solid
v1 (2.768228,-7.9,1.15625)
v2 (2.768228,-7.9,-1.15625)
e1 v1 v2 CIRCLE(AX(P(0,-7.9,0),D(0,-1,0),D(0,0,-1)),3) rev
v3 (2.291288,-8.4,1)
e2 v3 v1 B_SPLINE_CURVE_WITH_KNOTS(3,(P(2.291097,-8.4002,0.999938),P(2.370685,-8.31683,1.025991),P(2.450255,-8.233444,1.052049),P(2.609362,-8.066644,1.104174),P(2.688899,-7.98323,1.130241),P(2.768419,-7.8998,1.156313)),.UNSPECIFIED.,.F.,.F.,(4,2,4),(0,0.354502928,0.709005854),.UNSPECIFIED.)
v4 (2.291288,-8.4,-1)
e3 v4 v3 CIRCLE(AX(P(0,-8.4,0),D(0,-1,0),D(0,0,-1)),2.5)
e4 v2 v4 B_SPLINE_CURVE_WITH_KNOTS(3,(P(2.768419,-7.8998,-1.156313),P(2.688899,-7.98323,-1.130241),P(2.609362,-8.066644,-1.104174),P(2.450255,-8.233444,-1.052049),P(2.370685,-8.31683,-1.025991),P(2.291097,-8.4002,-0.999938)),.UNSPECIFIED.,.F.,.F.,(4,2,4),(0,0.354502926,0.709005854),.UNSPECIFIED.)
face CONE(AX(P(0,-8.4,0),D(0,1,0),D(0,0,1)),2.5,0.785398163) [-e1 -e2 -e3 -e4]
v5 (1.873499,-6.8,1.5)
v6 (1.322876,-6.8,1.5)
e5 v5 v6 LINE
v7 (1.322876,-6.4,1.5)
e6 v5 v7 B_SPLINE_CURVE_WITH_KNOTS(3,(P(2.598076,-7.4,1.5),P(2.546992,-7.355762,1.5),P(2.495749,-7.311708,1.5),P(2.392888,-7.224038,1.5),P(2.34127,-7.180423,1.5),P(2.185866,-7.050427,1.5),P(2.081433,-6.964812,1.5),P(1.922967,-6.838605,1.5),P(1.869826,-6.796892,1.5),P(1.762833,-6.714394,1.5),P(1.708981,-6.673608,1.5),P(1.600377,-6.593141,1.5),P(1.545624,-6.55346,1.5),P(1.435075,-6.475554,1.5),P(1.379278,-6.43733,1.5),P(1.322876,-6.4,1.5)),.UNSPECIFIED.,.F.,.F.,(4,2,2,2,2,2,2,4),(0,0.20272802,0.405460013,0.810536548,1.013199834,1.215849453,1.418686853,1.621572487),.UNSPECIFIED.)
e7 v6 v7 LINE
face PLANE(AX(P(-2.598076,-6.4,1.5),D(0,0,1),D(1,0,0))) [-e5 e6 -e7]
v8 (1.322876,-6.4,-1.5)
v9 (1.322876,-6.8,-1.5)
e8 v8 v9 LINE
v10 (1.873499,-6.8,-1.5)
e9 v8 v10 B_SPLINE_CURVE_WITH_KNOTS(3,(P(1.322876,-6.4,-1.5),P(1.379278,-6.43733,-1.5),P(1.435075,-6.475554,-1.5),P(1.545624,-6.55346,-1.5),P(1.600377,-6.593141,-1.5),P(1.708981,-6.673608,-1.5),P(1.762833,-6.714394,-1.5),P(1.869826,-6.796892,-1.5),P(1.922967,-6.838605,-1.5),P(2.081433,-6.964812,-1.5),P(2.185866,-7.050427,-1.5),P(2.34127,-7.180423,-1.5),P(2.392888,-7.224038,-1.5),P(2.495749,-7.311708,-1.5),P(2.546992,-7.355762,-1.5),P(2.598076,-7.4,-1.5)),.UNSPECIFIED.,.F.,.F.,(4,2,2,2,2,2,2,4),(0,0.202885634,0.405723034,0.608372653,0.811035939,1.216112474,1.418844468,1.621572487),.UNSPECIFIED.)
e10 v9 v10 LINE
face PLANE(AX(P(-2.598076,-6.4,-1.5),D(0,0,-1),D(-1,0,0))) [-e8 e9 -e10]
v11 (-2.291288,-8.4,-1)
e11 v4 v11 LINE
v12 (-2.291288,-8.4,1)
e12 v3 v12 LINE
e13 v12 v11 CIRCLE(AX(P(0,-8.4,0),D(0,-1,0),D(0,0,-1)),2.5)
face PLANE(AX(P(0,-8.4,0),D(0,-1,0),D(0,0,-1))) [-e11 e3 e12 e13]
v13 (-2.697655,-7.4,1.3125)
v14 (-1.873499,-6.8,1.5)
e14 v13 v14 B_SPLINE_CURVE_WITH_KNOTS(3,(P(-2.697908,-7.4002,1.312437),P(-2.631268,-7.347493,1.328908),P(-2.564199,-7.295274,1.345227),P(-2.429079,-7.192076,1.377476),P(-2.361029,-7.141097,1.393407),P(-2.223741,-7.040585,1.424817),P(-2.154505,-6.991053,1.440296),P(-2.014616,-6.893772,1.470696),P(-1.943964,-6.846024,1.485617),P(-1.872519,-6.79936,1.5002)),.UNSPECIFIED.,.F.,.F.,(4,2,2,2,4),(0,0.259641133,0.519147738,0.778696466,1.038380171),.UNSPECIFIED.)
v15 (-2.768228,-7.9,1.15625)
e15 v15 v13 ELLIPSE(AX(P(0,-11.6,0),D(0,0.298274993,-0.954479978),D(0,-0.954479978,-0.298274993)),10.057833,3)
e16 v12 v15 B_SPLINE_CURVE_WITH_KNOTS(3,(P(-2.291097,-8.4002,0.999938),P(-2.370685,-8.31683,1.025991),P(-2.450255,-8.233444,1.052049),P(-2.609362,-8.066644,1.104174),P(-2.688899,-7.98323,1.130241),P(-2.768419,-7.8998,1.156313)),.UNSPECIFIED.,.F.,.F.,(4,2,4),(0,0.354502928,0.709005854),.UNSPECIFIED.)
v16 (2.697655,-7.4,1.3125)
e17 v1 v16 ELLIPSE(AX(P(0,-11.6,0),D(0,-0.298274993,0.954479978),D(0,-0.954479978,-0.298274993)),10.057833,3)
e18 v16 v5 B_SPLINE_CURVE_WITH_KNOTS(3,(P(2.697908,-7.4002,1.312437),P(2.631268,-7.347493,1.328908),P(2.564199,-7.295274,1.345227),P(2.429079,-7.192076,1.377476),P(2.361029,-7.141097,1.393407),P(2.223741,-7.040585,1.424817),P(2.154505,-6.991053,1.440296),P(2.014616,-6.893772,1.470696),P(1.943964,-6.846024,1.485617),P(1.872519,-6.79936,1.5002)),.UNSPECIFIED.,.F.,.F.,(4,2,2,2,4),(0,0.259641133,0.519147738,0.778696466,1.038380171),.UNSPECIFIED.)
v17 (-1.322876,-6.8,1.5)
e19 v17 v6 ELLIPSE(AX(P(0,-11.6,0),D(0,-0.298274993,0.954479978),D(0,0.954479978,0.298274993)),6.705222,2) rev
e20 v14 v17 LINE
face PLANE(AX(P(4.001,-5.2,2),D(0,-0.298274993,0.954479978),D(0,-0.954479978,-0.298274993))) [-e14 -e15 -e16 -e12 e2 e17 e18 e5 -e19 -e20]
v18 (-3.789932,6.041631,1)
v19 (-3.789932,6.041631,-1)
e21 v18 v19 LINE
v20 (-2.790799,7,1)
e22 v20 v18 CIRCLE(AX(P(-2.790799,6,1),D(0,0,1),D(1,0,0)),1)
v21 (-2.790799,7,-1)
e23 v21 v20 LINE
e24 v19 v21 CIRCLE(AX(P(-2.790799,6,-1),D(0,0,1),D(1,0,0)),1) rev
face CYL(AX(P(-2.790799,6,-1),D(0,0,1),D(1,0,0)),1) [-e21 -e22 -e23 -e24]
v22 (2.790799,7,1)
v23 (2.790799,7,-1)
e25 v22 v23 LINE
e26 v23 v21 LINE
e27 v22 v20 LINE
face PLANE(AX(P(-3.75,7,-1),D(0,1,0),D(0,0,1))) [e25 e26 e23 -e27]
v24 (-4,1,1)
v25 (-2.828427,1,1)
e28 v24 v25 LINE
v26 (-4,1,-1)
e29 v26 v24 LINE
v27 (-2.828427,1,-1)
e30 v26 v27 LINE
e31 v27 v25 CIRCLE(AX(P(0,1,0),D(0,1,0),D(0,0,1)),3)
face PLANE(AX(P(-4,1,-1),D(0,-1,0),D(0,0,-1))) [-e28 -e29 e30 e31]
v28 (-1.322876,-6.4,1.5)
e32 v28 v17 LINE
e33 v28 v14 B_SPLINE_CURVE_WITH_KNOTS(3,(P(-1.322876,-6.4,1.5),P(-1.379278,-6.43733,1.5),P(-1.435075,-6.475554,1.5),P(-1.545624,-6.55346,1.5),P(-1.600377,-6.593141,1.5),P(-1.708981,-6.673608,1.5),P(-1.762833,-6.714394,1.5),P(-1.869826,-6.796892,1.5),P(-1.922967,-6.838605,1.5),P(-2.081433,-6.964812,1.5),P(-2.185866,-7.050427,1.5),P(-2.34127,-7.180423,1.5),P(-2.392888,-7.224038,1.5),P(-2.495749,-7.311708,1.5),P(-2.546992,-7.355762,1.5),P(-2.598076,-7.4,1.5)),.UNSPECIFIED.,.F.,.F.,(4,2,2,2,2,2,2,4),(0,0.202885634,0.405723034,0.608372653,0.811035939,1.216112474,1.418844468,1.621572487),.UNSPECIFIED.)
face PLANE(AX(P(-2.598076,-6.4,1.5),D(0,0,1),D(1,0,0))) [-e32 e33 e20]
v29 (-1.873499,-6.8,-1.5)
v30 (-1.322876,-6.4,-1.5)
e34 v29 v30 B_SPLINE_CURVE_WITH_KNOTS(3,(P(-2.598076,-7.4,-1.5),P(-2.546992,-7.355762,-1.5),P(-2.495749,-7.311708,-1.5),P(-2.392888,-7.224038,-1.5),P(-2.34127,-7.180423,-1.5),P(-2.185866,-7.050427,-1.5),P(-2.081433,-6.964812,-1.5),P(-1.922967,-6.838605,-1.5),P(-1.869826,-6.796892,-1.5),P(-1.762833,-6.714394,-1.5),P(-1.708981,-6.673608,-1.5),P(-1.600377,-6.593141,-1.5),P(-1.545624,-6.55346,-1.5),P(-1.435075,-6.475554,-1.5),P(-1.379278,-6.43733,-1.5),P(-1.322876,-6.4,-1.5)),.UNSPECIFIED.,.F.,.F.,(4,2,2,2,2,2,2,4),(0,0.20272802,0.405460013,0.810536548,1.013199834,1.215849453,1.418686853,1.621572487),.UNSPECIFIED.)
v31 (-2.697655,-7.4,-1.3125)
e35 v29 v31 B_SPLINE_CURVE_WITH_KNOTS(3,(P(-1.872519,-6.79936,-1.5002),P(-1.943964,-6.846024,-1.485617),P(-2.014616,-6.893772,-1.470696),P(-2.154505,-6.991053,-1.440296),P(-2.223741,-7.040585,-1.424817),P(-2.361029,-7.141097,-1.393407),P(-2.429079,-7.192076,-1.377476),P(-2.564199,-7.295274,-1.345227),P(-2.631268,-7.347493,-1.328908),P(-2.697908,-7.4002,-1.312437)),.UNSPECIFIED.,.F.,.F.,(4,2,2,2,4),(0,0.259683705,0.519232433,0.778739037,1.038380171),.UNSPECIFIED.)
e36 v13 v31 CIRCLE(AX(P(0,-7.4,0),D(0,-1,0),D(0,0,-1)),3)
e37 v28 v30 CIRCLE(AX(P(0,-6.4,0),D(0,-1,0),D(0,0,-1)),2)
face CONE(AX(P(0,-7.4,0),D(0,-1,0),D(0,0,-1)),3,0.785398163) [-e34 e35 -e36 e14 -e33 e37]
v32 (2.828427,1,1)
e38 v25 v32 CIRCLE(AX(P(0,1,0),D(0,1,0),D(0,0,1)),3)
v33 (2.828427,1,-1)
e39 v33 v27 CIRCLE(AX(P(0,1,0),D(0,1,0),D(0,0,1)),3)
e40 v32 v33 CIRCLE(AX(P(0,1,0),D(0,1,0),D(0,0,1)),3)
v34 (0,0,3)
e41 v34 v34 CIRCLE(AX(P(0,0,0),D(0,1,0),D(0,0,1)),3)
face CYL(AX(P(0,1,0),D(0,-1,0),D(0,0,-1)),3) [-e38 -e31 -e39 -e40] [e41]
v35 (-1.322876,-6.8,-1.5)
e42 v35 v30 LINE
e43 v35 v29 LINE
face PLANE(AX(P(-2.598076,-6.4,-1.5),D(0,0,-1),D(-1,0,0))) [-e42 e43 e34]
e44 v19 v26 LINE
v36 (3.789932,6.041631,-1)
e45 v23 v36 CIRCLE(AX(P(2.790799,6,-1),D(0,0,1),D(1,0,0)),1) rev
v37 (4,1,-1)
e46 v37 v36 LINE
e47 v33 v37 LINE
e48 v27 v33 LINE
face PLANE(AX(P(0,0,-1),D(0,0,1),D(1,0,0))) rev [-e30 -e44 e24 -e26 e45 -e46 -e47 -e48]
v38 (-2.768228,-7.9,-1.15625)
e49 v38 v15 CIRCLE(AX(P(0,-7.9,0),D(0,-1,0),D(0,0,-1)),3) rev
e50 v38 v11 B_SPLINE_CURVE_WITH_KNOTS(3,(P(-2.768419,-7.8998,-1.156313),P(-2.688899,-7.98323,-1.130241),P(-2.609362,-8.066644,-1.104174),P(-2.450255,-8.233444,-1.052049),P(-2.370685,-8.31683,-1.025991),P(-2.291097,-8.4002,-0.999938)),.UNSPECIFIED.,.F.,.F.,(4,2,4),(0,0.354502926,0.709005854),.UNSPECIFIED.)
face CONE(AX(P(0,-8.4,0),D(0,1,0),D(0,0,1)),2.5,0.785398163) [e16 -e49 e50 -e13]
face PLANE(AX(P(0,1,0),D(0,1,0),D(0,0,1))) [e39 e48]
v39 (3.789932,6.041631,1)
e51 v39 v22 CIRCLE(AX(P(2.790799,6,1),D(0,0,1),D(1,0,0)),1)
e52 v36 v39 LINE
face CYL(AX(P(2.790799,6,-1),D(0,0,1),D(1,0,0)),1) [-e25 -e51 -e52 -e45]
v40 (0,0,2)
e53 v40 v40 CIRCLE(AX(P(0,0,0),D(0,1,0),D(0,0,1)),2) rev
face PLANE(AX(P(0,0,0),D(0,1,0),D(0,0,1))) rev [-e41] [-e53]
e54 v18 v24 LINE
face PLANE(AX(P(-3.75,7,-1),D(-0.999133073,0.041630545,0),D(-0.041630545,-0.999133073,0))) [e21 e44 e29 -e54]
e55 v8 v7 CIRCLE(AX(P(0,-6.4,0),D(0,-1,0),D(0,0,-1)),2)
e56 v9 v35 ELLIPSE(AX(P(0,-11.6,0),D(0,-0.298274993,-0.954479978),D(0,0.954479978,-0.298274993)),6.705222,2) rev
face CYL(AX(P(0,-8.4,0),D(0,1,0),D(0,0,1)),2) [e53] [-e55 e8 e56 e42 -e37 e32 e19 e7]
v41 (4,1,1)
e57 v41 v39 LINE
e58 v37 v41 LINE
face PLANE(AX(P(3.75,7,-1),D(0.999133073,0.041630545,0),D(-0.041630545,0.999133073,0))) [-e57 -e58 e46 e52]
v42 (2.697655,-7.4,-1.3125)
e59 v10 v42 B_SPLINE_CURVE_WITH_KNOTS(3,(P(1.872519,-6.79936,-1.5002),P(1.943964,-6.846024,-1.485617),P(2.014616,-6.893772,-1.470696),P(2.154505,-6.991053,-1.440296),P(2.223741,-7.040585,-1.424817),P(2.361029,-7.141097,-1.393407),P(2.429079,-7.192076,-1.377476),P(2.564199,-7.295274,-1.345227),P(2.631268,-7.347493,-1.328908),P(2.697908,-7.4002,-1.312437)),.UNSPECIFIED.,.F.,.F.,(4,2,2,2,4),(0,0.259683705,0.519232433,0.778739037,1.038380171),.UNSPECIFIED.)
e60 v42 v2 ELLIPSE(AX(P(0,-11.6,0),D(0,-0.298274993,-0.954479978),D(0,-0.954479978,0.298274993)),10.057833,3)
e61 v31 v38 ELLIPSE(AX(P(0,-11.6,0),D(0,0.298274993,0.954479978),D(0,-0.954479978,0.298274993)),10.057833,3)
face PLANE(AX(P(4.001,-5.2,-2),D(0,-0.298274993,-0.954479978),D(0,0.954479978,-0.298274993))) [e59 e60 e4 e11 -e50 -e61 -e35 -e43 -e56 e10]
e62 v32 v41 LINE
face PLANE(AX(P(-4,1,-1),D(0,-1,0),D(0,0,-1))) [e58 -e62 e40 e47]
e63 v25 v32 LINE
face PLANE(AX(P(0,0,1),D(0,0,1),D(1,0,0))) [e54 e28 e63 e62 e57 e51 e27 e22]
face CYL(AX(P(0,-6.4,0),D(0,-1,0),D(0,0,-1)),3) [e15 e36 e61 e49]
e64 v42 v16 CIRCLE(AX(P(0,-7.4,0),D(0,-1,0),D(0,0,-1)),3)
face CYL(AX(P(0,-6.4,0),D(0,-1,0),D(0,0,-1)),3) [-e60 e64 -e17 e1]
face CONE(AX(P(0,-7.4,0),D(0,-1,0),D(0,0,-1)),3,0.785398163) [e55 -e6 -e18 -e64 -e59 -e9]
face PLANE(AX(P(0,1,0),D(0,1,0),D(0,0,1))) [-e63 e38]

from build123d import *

# Parameters (mm, degrees)
SKETCH_1_R                      = 3
EXTRUDE_1_DEPTH                 = 1
EXTRUDE_2_DEPTH                 = 1
EXTRUDE_2_DEPTH_BACK            = 1
FILLET_1_R                      = 1
SKETCH_3_R                      = 2
EXTRUDE_3_DEPTH                 = 8.4
EXTRUDE_4_DEPTH                 = 2
CHAMFER_1_SIZE                  = 0.5
CHAMFER_2_SIZE                  = 1
CUT_EXTRUDE_1_REACH             = 11.775
CUT_EXTRUDE_1_DIRECTION_2_REACH = 11.775


with BuildPart() as part:
    # 草图1 → 凸台-拉伸1 (new body)
    with BuildSketch(Plane(origin=(0, 0, 0), x_dir=(1, 0, 0), z_dir=(0, 1, 0))):
        with Locations(Location((0, 0, 0), (0, 0, 270))):
            Circle(SKETCH_1_R)
    extrude(amount=EXTRUDE_1_DEPTH)

    # 草图2 → 凸台-拉伸2 (add, two sides: drawn at the far end of the back side and taken through both)
    with BuildSketch(Plane.XY.offset(-EXTRUDE_2_DEPTH_BACK)):
        Polygon((-3.75, 7), (3.75, 7), (4, 1), (-4, 1), align=None)
    extrude(amount=EXTRUDE_2_DEPTH + EXTRUDE_2_DEPTH_BACK)

    # 圆角1
    fillet_1_edges = [part.edges().sort_by_distance(p)[0] for p in [
        (-3.75, 7, 0),
        (3.75, 7, 0),
    ]]
    fillet(fillet_1_edges, radius=FILLET_1_R)

    # 草图3 → 凸台-拉伸3 (add)
    with BuildSketch(Plane(origin=(0, 0, 0), x_dir=(-1, 0, 0), z_dir=(0, -1, 0))):
        with Locations(Location((0, 0, 0), (0, 0, 270))):
            Circle(SKETCH_3_R)
    extrude(amount=EXTRUDE_3_DEPTH)

    # 草图4 → 凸台-拉伸4 (add)
    with BuildSketch(Plane(origin=(0, -8.4, 0), x_dir=(-1, 0, 0), z_dir=(0, -1, 0))):
        with BuildLine():
            Line((2.598076211, -1.5), (-2.598076211, -1.5))
            ThreePointArc((-2.598076211, -1.5), (-3, 0), (-2.598076211, 1.5))
            Line((-2.598076211, 1.5), (2.598076211, 1.5))
            ThreePointArc((2.598076211, 1.5), (3, 0), (2.598076211, -1.5))
        make_face()
    extrude(amount=-EXTRUDE_4_DEPTH)

    # 倒角1
    chamfer_1_edges = [part.edges().sort_by_distance(p)[0] for p in [
        (3, -8.4, 0),
        (-3, -8.4, 0),
    ]]
    chamfer(chamfer_1_edges, length=CHAMFER_1_SIZE)

    # 倒角2
    chamfer_2_edges = [part.edges().sort_by_distance(p)[0] for p in [
        (3, -6.4, 0),
        (-3, -6.4, 0),
    ]]
    chamfer(chamfer_2_edges, length=CHAMFER_2_SIZE - 0.0001)  # a hair under: the kernel refuses the full size

    # 草图5 → 切除-拉伸1 (cut, up to next)
    with BuildSketch(Plane(origin=(0, 0, 0), x_dir=(0, 0, -1), z_dir=(1, 0, 0)), mode=Mode.PRIVATE) as cut_extrude_1_sk1:
        Polygon((2, -5.2), (1, -8.4), (2, -8.4), align=None)
    cut_extrude_1_tool1 = extrude(cut_extrude_1_sk1.sketch, amount=-CUT_EXTRUDE_1_REACH, mode=Mode.PRIVATE) & part.part
    # 草图5 → 切除-拉伸1 (cut, up to next)
    with BuildSketch(Plane(origin=(0, 0, 0), x_dir=(0, 0, -1), z_dir=(1, 0, 0)), mode=Mode.PRIVATE) as cut_extrude_1_sk2:
        Polygon((-2, -5.2), (-2, -8.4), (-1, -8.4), align=None)
    cut_extrude_1_tool2 = extrude(cut_extrude_1_sk2.sketch, amount=-CUT_EXTRUDE_1_REACH, mode=Mode.PRIVATE) & part.part
    add(cut_extrude_1_tool1.solids().sort_by_distance((0, -7.333333, -1.666667))[0], mode=Mode.SUBTRACT)
    add(cut_extrude_1_tool2.solids().sort_by_distance((0, -7.333333, 1.666667))[0], mode=Mode.SUBTRACT)

    # 草图5 → 切除-拉伸1 direction 2 (cut, up to next)
    with BuildSketch(Plane(origin=(0, 0, 0), x_dir=(0, 0, -1), z_dir=(1, 0, 0)), mode=Mode.PRIVATE) as cut_extrude_1_direction_2_sk1:
        Polygon((2, -5.2), (1, -8.4), (2, -8.4), align=None)
    cut_extrude_1_direction_2_tool1 = extrude(cut_extrude_1_direction_2_sk1.sketch, amount=CUT_EXTRUDE_1_DIRECTION_2_REACH, mode=Mode.PRIVATE) & part.part
    # 草图5 → 切除-拉伸1 direction 2 (cut, up to next)
    with BuildSketch(Plane(origin=(0, 0, 0), x_dir=(0, 0, -1), z_dir=(1, 0, 0)), mode=Mode.PRIVATE) as cut_extrude_1_direction_2_sk2:
        Polygon((-2, -5.2), (-2, -8.4), (-1, -8.4), align=None)
    cut_extrude_1_direction_2_tool2 = extrude(cut_extrude_1_direction_2_sk2.sketch, amount=CUT_EXTRUDE_1_DIRECTION_2_REACH, mode=Mode.PRIVATE) & part.part
    add(cut_extrude_1_direction_2_tool1.solids().sort_by_distance((0, -7.333333, -1.666667))[0], mode=Mode.SUBTRACT)
    add(cut_extrude_1_direction_2_tool2.solids().sort_by_distance((0, -7.333333, 1.666667))[0], mode=Mode.SUBTRACT)


solid = part.part
